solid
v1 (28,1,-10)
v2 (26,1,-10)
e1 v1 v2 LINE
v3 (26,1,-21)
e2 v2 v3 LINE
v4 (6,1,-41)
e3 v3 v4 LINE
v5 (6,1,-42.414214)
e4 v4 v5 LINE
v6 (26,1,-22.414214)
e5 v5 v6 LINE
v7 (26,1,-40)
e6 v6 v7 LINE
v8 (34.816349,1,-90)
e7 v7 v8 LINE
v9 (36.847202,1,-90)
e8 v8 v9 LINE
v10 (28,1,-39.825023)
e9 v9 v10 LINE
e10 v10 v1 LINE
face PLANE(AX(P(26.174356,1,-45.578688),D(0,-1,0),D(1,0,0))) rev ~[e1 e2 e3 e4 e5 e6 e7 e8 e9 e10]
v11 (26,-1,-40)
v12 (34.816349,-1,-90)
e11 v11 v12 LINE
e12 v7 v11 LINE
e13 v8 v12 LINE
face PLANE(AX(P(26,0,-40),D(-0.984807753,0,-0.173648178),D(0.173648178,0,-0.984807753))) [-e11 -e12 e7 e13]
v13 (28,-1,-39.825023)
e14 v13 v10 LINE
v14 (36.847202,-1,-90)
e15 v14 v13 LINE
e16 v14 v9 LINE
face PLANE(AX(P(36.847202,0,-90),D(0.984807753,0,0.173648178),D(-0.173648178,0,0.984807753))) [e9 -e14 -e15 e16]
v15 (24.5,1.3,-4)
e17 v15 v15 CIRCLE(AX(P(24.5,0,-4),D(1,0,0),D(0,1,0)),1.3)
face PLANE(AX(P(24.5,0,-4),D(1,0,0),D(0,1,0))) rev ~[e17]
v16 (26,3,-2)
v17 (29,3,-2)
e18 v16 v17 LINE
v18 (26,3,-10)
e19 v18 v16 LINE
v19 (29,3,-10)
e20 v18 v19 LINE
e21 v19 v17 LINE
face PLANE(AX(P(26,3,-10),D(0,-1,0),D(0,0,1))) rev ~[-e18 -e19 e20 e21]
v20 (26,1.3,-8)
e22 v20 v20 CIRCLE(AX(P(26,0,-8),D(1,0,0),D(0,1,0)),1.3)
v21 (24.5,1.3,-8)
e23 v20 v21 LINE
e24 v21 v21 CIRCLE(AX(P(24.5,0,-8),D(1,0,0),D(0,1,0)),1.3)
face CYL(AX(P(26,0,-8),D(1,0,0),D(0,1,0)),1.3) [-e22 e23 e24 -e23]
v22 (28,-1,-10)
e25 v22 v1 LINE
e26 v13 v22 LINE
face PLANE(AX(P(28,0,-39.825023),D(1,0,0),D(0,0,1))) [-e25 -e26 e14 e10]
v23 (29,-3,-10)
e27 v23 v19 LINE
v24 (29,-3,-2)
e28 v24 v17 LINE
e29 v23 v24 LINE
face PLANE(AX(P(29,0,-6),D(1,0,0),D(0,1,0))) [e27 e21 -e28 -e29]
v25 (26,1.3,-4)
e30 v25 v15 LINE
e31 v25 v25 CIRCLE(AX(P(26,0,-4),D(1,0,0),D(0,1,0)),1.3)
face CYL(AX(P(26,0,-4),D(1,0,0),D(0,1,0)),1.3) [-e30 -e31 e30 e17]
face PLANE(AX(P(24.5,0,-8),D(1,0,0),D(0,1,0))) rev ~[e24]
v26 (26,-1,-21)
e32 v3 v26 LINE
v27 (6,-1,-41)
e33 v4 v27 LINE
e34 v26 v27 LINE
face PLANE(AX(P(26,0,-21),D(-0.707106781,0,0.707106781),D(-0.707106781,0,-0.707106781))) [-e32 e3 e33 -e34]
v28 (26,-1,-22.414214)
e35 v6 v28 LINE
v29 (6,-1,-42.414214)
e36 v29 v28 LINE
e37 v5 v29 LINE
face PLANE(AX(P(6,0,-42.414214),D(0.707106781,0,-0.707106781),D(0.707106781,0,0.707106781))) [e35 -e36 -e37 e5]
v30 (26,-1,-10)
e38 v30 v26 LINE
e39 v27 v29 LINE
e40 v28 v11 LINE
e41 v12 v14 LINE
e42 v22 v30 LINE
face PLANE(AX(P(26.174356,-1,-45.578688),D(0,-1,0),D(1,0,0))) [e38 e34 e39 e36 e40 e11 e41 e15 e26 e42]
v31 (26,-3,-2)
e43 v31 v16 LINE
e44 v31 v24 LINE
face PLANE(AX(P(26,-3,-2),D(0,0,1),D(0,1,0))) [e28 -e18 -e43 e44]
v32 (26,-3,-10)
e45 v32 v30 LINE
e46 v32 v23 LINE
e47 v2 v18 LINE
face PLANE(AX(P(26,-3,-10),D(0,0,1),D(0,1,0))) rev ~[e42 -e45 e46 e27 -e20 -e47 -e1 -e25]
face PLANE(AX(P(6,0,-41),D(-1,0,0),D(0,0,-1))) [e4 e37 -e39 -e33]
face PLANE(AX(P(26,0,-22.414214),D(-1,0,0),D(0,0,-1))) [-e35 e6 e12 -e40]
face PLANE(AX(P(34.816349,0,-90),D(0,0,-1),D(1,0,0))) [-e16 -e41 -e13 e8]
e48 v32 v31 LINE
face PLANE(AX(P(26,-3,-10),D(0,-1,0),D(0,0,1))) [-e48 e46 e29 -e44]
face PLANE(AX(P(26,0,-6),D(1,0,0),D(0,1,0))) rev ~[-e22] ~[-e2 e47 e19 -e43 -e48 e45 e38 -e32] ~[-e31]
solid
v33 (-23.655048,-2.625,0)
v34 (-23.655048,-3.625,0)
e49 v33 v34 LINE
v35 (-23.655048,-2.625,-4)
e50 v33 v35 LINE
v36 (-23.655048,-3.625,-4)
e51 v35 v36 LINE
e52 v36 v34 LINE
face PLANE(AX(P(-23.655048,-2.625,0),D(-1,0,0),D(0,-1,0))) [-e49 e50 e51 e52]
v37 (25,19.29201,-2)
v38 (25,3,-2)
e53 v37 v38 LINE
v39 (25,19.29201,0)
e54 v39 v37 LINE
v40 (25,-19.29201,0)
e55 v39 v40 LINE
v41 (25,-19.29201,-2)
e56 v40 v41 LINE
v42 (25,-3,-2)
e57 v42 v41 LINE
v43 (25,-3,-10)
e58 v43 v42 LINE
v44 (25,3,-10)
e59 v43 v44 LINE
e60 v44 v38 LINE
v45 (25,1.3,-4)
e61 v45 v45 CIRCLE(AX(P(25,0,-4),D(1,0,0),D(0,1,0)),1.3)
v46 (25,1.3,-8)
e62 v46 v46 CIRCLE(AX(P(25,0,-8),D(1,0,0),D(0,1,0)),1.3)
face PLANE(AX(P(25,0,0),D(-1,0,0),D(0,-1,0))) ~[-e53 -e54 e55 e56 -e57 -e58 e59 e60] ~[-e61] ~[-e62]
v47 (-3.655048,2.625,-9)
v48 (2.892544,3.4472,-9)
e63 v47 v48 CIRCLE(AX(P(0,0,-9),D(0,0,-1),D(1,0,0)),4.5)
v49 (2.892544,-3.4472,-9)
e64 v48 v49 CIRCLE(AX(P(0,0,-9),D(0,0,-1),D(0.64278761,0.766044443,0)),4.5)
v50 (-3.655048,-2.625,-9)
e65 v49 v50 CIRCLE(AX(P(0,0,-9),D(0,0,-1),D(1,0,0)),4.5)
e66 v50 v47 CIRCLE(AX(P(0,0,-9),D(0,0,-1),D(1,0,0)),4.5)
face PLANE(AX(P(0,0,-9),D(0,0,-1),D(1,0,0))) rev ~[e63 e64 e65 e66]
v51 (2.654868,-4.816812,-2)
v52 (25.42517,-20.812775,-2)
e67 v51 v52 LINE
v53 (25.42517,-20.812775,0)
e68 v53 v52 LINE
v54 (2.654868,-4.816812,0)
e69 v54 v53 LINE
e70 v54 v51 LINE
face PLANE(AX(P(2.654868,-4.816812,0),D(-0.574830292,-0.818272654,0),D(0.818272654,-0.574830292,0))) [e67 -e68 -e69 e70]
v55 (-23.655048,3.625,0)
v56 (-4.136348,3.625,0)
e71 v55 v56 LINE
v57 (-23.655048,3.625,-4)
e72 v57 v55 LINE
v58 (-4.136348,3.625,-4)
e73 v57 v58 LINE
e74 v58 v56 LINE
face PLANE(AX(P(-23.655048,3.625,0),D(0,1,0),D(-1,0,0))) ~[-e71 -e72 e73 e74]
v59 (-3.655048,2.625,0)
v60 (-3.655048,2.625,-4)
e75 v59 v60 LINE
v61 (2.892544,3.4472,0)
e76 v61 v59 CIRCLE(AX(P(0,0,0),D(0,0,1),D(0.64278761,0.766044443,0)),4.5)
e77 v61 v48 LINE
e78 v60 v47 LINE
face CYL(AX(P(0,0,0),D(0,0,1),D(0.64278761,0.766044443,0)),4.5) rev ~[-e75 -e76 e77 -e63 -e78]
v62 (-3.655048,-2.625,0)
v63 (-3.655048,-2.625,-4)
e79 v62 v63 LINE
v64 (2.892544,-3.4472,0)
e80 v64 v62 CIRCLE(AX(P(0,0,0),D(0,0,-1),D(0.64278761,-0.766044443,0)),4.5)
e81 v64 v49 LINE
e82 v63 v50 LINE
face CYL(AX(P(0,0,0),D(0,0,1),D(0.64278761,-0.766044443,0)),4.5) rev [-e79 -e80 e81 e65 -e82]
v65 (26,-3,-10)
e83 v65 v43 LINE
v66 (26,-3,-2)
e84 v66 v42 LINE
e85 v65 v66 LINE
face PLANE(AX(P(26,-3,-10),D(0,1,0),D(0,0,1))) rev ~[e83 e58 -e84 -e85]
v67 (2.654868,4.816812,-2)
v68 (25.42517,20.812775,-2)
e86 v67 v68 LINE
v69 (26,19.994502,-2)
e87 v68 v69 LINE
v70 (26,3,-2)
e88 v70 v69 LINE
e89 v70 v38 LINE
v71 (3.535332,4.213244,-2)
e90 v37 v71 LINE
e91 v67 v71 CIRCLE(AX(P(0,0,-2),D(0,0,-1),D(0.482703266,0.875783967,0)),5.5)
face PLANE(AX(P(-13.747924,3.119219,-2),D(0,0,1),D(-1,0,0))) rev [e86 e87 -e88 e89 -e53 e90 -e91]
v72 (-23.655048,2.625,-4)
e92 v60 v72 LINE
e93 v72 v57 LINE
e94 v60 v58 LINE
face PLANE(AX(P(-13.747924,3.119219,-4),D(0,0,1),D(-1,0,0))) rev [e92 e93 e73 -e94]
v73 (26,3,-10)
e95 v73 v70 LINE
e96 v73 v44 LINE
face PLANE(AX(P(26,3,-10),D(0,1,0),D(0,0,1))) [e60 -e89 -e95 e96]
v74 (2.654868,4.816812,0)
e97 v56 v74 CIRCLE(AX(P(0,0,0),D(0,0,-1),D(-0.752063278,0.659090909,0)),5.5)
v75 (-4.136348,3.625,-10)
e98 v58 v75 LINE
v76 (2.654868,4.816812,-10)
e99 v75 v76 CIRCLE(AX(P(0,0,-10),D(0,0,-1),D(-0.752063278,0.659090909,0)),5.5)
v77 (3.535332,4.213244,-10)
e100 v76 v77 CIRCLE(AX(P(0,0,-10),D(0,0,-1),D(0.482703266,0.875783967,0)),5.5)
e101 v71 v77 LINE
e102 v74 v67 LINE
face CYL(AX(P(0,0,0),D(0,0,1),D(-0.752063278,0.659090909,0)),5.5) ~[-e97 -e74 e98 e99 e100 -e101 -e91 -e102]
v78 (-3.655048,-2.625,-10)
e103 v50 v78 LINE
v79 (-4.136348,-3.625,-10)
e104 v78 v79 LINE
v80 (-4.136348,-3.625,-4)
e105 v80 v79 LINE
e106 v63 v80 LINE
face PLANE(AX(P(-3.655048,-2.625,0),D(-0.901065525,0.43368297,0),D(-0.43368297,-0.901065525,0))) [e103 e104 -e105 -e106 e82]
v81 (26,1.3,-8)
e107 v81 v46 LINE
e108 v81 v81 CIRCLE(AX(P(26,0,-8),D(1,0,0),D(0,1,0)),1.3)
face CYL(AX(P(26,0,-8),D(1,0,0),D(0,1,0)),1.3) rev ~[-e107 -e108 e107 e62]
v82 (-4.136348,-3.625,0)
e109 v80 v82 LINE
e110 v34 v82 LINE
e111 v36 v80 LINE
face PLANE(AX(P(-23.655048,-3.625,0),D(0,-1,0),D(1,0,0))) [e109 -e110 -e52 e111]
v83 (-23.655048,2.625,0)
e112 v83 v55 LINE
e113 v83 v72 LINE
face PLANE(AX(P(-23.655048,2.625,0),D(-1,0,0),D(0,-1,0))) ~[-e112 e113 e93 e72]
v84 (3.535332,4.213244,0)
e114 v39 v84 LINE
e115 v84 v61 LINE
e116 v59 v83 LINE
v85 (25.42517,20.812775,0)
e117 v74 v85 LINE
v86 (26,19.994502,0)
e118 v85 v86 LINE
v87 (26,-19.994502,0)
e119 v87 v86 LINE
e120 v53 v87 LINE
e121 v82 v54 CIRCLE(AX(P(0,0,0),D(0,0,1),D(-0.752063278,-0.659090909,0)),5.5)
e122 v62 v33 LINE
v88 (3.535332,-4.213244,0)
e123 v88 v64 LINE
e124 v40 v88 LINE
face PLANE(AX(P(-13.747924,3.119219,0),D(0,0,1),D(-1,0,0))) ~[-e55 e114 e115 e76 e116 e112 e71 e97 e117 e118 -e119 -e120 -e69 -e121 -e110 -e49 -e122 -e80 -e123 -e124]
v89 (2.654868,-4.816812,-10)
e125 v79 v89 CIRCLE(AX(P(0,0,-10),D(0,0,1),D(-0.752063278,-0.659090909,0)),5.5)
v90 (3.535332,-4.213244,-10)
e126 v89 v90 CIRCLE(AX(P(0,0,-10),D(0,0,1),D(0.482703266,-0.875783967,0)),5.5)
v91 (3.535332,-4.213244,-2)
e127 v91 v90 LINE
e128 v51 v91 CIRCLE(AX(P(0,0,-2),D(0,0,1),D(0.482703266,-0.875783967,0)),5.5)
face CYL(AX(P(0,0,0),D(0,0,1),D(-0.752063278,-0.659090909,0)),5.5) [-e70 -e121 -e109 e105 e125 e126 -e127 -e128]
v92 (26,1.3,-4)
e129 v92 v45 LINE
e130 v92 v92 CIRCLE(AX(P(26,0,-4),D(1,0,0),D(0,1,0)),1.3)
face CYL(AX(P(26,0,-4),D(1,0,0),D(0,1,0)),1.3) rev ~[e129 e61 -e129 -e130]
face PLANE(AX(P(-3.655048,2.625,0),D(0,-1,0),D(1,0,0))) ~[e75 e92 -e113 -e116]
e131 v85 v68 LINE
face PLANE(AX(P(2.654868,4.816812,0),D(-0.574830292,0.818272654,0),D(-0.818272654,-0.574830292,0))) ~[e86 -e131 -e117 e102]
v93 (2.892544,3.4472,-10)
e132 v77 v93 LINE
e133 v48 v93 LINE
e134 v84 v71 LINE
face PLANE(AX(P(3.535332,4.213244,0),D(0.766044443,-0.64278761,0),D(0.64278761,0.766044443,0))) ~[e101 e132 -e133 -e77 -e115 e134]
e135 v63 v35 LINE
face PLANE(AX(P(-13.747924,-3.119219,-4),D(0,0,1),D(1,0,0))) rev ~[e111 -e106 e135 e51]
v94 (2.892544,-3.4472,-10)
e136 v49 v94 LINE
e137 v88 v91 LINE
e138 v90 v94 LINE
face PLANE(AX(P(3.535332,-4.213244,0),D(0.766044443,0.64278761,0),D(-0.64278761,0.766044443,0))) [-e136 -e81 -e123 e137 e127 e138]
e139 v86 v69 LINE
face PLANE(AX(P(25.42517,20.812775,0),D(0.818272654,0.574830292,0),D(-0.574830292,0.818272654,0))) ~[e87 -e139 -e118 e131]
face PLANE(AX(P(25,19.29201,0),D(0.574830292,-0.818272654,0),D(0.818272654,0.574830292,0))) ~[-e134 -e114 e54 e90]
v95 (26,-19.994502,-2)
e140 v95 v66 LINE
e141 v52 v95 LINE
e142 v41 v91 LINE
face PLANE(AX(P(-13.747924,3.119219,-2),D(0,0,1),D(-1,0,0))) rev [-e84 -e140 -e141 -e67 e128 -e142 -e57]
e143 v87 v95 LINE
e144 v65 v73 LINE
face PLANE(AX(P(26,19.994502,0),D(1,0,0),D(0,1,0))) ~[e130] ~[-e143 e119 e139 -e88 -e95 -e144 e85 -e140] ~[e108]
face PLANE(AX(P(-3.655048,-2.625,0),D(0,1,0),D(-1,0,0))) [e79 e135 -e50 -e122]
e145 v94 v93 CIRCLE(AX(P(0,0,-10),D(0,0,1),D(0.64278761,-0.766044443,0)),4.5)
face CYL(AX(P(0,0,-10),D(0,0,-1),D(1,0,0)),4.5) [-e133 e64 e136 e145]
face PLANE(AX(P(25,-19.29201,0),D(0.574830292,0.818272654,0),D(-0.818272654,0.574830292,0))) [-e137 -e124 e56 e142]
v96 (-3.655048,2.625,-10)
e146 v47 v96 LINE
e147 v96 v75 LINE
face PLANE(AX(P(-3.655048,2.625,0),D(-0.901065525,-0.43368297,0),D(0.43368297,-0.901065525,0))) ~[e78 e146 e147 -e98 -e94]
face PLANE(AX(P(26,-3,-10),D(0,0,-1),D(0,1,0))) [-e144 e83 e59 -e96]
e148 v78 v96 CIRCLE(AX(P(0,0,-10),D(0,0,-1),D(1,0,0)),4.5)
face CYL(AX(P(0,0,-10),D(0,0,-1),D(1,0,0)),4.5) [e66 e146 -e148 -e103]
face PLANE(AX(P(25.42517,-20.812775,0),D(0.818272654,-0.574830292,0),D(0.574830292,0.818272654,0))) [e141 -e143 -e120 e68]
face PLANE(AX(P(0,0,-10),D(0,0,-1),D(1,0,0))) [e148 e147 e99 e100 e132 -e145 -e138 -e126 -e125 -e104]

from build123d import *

# Parameters (mm, degrees)
F1_DEPTH  = 2
F2_DEPTH  = 4
F3_DEPTH  = 10
F5_R      = 4.5
F6_DEPTH  = 1
F7_W      = 6
F7_H      = 8
F7_R      = 1.3
F8_DEPTH  = 1
F9_DEPTH  = 3
F10_DEPTH = 1.5
F12_DEPTH = 1


with BuildPart() as f1:
    # F0 (on Top) → F1 (new body)
    with BuildSketch(Plane.XY):
        Polygon((-23.6550478793, -2.625), (-23.6550478793, -3.625), (-4.1363480269, -3.625), (-3.6550478793, -2.625), align=None)
        with BuildLine():
            Line((-3.6550478793, -2.625), (-4.1363480269, -3.625))
            ThreePointArc((-4.1363480269, -3.625), (-0.9506837802, -5.4172133381), (2.6548679611, -4.81681182))
            ThreePointArc((2.6548679611, -4.81681182), (3.1097776177, -4.5364394814), (3.5353318533, -4.2132444372))
            Line((3.5353318533, -4.2132444372), (2.8925442436, -3.447199994))
            ThreePointArc((2.8925442436, -3.447199994), (-0.5606747329, -4.4649349204), (-3.6550478793, -2.625))
        make_face()
        with BuildLine():
            ThreePointArc((3.5353318533, -4.2132444372), (3.1097776177, -4.5364394814), (2.6548679611, -4.81681182))
            Line((2.6548679611, -4.81681182), (25.4251697083, -20.8127749449))
            Line((25.4251697083, -20.8127749449), (26, -19.9945022912))
            Line((26, -19.9945022912), (25, -19.9945022912))
            Line((25, -19.9945022912), (25, -19.2920099262))
            Line((25, -19.2920099262), (3.5353318533, -4.2132444372))
        make_face()
        Polygon((25, 0), (25, -19.2920099262), (26, -19.9945022912), (26, 0), align=None)
        Polygon((26, -19.9945022912), (25, -19.2920099262), (25, -19.9945022912), align=None)
    extrude(amount=-F1_DEPTH)

    # F0 (on Top) → F2 (join)
    with BuildSketch(Plane.XY):
        Polygon((-23.6550478793, -2.625), (-23.6550478793, -3.625), (-4.1363480269, -3.625), (-3.6550478793, -2.625), align=None)
        with BuildLine():
            Line((-3.6550478793, -2.625), (-4.1363480269, -3.625))
            ThreePointArc((-4.1363480269, -3.625), (-0.9506837802, -5.4172133381), (2.6548679611, -4.81681182))
            ThreePointArc((2.6548679611, -4.81681182), (3.1097776177, -4.5364394814), (3.5353318533, -4.2132444372))
            Line((3.5353318533, -4.2132444372), (2.8925442436, -3.447199994))
            ThreePointArc((2.8925442436, -3.447199994), (-0.5606747329, -4.4649349204), (-3.6550478793, -2.625))
        make_face()
    extrude(amount=-F2_DEPTH)

    # F0 (on Top) → F3 (join)
    with BuildSketch(Plane.XY):
        with BuildLine():
            Line((-3.6550478793, -2.625), (-4.1363480269, -3.625))
            ThreePointArc((-4.1363480269, -3.625), (-0.9506837802, -5.4172133381), (2.6548679611, -4.81681182))
            ThreePointArc((2.6548679611, -4.81681182), (3.1097776177, -4.5364394814), (3.5353318533, -4.2132444372))
            Line((3.5353318533, -4.2132444372), (2.8925442436, -3.447199994))
            ThreePointArc((2.8925442436, -3.447199994), (-0.5606747329, -4.4649349204), (-3.6550478793, -2.625))
        make_face()
    extrude(amount=-F3_DEPTH)

    # F4: F1 across plane


with BuildPart() as f1_1:
    add(f1.part)
    add(f1.part.mirror(Plane.XZ))

    # F5 (on face) → F6 (join)
    with BuildSketch(Plane(origin=(0, 0, -10), x_dir=(1, 0, 0), z_dir=(0, 0, -1))):
        Circle(F5_R)
    extrude(amount=-F6_DEPTH)

    # F7 (on face) → F8 (join, through all)
    with BuildSketch(Plane.YZ.offset(26)):
        with Locations((0, -6)):
            Rectangle(F7_W, F7_H)
        with Locations((0, -8)):
            Circle(F7_R, mode=Mode.SUBTRACT)
        with Locations((0, -4)):
            Circle(F7_R, mode=Mode.SUBTRACT)
    extrude(amount=-F8_DEPTH)


with BuildPart() as f9:
    # F7 (on face) → F9 (new body)
    with BuildSketch(Plane.YZ.offset(26)):
        with Locations((0, -6)):
            Rectangle(F7_W, F7_H)
        with Locations((0, -8)):
            Circle(F7_R, mode=Mode.SUBTRACT)
        with Locations((0, -4)):
            Circle(F7_R, mode=Mode.SUBTRACT)
        with Locations((0, -4)):
            Circle(F7_R)
        with Locations((0, -8)):
            Circle(F7_R)
    extrude(amount=F9_DEPTH)

    # F7 (on face) → F10 (join)
    with BuildSketch(Plane.YZ.offset(26)):
        with Locations((0, -4)):
            Circle(F7_R)
        with Locations((0, -8)):
            Circle(F7_R)
    extrude(amount=-F10_DEPTH)

    # F11 (on Front) → F12 (join, symmetric)
    with BuildSketch(Plane.XZ):
        Polygon((28, -10), (26, -10), (26, -21), (6, -41), (6, -42.4142135624), (26, -22.4142135624), (26, -40), (34.8163490354, -90), (36.8472022592, -90), (28, -39.8250226729), align=None)
    extrude(amount=F12_DEPTH, both=True)


solid = Compound([f1_1.part, f9.part])
